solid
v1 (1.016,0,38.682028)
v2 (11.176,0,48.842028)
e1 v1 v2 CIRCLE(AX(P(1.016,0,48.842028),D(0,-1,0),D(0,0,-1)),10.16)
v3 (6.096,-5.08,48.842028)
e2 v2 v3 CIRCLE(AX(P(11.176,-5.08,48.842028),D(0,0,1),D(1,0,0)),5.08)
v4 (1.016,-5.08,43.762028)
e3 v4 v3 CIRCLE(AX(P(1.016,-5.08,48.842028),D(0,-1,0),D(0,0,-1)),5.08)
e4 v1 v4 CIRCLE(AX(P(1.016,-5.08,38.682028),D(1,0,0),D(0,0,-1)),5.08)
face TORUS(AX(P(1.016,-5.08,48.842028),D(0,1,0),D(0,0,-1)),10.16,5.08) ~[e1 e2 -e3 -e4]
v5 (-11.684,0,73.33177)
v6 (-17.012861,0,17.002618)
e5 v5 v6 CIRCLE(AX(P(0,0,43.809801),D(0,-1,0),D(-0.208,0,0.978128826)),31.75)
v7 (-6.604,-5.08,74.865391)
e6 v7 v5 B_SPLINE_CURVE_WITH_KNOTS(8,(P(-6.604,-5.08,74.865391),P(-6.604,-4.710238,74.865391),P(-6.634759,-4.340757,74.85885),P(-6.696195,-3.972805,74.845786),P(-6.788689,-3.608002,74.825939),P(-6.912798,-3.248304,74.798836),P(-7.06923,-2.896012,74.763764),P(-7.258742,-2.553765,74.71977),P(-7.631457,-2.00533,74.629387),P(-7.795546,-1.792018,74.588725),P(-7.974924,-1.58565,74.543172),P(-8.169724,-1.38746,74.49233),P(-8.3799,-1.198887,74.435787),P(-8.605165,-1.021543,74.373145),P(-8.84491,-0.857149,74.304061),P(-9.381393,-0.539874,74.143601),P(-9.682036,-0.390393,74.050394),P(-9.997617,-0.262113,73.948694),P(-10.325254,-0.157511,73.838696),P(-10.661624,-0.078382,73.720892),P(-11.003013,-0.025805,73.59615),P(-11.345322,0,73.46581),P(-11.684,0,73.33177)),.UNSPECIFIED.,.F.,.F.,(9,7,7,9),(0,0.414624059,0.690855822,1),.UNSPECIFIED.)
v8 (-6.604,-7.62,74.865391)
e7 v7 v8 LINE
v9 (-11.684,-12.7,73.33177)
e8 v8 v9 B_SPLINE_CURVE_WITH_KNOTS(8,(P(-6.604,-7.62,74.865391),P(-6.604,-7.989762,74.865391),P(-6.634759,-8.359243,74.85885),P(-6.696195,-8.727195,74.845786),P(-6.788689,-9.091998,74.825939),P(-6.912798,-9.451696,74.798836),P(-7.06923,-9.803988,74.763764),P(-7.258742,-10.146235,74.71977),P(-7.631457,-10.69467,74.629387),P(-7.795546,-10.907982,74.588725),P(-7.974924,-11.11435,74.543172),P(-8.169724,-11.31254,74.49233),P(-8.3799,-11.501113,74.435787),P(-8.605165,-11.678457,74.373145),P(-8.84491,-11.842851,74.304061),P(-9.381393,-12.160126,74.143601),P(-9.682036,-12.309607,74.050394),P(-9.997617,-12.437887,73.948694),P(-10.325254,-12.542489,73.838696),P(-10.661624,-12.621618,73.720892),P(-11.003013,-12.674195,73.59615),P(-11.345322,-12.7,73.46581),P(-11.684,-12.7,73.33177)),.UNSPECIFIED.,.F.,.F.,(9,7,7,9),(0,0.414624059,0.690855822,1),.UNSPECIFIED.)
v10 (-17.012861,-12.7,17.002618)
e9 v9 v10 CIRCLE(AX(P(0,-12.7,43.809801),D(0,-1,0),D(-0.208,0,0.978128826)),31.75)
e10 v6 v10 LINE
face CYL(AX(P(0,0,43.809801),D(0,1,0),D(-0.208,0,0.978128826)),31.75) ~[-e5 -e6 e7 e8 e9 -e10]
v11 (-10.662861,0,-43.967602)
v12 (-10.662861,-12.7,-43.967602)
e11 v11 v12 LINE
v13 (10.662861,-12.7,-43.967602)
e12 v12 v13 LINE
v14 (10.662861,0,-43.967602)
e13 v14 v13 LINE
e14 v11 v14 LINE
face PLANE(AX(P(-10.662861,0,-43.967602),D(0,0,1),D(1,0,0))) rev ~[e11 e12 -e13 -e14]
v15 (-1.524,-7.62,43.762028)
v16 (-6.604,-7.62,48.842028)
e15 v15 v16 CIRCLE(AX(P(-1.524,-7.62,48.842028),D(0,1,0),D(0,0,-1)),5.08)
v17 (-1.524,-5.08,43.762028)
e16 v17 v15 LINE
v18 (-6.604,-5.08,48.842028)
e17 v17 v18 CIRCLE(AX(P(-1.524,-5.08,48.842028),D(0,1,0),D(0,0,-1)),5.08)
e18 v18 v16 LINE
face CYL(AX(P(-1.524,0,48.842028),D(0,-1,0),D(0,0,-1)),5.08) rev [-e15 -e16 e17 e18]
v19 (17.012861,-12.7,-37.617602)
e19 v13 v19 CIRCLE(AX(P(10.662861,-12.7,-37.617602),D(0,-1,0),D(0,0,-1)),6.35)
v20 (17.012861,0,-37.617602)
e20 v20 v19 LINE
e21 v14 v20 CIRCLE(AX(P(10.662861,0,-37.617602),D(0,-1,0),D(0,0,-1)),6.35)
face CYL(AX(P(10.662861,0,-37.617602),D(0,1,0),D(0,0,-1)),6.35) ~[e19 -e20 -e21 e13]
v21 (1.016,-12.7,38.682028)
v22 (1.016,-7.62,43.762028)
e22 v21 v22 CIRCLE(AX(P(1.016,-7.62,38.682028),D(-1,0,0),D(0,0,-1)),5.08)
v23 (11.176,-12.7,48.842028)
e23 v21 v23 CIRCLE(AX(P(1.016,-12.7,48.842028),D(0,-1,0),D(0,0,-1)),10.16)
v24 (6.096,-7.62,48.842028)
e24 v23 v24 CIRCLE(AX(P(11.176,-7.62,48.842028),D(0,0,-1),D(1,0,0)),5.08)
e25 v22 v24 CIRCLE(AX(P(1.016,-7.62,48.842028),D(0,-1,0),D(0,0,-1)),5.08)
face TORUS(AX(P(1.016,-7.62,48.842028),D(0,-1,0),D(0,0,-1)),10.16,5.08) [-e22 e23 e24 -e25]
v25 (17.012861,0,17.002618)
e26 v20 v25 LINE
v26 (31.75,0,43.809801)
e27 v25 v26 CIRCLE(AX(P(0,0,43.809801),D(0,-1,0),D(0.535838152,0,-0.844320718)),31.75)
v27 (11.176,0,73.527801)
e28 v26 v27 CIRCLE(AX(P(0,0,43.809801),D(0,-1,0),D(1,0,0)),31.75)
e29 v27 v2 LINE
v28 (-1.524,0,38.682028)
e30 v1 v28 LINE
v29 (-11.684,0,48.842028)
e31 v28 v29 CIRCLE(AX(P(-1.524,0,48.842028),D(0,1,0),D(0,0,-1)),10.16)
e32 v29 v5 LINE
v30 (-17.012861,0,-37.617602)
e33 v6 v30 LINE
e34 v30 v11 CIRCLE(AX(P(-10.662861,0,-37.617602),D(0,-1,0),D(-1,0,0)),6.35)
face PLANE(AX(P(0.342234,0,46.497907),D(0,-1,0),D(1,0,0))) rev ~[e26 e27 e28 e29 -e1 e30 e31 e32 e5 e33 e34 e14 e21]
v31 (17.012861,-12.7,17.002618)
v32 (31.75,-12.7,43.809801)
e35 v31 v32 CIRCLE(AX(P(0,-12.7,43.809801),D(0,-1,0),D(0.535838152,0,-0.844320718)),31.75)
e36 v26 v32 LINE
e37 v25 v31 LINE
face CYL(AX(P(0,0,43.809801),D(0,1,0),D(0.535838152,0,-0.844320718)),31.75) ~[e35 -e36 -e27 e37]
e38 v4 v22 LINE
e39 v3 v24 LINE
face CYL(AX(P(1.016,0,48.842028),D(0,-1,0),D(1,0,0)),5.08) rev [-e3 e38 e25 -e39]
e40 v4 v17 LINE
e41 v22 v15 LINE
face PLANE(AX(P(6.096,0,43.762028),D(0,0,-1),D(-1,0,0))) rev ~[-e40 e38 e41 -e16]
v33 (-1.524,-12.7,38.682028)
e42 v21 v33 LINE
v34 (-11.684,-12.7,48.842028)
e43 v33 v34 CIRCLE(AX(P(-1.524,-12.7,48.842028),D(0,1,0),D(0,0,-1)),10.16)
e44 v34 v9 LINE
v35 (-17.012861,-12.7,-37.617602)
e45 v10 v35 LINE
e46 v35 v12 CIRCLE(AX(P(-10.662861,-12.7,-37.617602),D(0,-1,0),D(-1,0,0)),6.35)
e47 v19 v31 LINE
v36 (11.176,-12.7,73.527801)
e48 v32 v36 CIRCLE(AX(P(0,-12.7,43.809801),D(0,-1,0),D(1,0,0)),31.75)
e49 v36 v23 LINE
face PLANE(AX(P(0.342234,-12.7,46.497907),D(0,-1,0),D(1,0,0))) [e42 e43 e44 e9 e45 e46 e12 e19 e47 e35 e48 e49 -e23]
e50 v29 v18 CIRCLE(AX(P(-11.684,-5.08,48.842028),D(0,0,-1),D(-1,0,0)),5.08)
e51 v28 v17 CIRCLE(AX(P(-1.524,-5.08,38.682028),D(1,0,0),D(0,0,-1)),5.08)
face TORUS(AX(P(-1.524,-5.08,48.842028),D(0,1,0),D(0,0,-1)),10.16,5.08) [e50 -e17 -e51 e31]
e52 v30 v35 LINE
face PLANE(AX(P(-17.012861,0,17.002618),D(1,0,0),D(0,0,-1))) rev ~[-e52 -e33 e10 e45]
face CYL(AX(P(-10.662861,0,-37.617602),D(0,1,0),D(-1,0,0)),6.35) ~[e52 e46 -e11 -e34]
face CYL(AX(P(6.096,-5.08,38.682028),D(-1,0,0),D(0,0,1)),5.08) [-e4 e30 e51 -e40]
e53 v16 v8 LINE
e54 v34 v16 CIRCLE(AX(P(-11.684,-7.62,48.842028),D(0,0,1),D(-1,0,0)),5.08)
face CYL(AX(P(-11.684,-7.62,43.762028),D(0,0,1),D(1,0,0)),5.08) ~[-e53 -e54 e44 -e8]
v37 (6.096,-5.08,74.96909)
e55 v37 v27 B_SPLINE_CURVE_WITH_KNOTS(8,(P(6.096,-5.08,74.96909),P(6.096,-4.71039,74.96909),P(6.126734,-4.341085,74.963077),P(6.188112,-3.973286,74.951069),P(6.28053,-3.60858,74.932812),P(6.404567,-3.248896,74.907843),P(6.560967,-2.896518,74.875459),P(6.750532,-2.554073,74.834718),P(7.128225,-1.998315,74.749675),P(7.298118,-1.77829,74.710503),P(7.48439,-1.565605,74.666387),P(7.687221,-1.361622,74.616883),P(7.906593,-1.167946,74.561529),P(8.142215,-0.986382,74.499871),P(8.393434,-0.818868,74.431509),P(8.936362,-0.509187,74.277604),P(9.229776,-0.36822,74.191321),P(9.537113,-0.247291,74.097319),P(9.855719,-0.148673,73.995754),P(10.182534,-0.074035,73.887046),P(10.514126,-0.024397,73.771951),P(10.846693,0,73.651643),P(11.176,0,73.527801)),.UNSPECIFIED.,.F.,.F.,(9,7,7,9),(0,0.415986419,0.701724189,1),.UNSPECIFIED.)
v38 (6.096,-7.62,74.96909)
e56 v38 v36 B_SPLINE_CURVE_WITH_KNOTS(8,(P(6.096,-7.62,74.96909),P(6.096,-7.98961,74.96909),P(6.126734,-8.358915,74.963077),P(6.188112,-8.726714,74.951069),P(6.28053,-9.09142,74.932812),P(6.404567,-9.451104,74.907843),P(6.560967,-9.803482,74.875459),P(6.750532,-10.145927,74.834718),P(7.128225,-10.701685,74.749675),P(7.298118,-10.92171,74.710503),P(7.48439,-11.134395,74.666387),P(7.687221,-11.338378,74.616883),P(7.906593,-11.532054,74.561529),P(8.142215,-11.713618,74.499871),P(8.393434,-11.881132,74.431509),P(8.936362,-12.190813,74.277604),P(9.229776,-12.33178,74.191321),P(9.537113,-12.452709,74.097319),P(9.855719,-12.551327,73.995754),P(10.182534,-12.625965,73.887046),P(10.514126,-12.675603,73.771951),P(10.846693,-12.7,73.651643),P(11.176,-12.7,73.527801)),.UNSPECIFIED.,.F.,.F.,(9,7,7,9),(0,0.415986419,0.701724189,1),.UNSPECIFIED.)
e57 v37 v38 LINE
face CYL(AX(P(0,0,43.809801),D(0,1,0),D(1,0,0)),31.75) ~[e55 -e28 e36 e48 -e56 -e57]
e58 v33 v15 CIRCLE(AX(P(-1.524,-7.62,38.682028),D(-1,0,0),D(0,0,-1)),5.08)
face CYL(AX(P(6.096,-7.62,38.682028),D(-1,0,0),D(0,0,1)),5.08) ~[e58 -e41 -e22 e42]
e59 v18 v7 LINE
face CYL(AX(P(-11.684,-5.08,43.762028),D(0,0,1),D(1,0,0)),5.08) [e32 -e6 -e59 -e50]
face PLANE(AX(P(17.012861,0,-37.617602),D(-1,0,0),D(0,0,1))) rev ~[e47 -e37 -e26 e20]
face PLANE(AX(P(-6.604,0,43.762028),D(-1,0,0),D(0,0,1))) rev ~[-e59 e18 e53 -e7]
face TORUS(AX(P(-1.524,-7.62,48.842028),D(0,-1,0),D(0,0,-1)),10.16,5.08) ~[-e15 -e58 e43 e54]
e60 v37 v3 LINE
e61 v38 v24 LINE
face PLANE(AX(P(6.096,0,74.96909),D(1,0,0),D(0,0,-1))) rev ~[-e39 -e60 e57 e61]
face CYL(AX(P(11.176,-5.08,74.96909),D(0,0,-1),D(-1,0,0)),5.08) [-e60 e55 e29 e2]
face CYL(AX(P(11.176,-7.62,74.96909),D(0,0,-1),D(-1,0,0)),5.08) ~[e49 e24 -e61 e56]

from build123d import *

# Parameters (mm, degrees)
F1_DEPTH = 12.7
F2_R     = 5.08


# Not quite as in the source:
# - a feature names something its author has since deleted; it is built from what else it names


with BuildPart() as f1:
    # F0 (on Front) → F1 (new body)
    with BuildSketch(Plane.XZ):
        with BuildLine():
            ThreePointArc((-6.6039999947, 74.8653914212), (-31.2484265209, 49.4310412723), (-17.0128613258, 17.0026184017))
            Line((-17.0128613258, 17.0026184017), (17.0128613258, 17.0026184017))
            ThreePointArc((17.0128613258, 17.0026184017), (27.8228399619, 28.5143091682), (31.75, 43.8098011987))
            ThreePointArc((31.75, 43.8098011987), (24.5113290151, 63.9904168958), (6.0960000053, 74.9690900855))
            Line((6.0960000053, 74.9690900855), (6.0960000053, 62.4722737233))
            Line((6.0960000053, 62.4722737233), (6.0960000053, 43.7620282173))
            Line((6.0960000053, 43.7620282173), (-6.6039999947, 43.7620282173))
            Line((-6.6039999947, 43.7620282173), (-6.6039999947, 62.4722737233))
            Line((-6.6039999947, 62.4722737233), (-6.6039999947, 74.8653914212))
        make_face()
        with BuildLine():
            ThreePointArc((17.0128613258, 17.0026184017), (0, 12.0598011987), (-17.0128613258, 17.0026184017))
            Line((-17.0128613258, 17.0026184017), (-17.0128613258, -37.617602489))
            ThreePointArc((-17.0128613258, -37.617602489), (-15.1529893863, -42.1077305495), (-10.6628613258, -43.967602489))
            Line((-10.6628613258, -43.967602489), (10.6628613258, -43.967602489))
            ThreePointArc((10.6628613258, -43.967602489), (15.1529893863, -42.1077305495), (17.0128613258, -37.617602489))
            Line((17.0128613258, -37.617602489), (17.0128613258, 17.0026184017))
        make_face()
        with BuildLine():
            Line((17.0128613258, 17.0026184017), (-17.0128613258, 17.0026184017))
            ThreePointArc((-17.0128613258, 17.0026184017), (0, 12.0598011987), (17.0128613258, 17.0026184017))
        make_face()
    extrude(amount=F1_DEPTH)

    # F2
    f2_edges = [f1.edges().sort_by_distance(p)[0] for p in [
        (6.096, -6.35, 43.762028),
        (-6.604, -6.35, 43.762028),
        (-0.254, 0, 43.762028),
        (-0.254, -12.7, 43.762028),
        (6.096, 0, 59.365559),
        (6.096, -12.7, 59.365559),
        (-6.604, 0, 59.31371),
        (-6.604, -12.7, 59.31371),
    ]]
    fillet(f2_edges, radius=F2_R)


solid = f1.part
